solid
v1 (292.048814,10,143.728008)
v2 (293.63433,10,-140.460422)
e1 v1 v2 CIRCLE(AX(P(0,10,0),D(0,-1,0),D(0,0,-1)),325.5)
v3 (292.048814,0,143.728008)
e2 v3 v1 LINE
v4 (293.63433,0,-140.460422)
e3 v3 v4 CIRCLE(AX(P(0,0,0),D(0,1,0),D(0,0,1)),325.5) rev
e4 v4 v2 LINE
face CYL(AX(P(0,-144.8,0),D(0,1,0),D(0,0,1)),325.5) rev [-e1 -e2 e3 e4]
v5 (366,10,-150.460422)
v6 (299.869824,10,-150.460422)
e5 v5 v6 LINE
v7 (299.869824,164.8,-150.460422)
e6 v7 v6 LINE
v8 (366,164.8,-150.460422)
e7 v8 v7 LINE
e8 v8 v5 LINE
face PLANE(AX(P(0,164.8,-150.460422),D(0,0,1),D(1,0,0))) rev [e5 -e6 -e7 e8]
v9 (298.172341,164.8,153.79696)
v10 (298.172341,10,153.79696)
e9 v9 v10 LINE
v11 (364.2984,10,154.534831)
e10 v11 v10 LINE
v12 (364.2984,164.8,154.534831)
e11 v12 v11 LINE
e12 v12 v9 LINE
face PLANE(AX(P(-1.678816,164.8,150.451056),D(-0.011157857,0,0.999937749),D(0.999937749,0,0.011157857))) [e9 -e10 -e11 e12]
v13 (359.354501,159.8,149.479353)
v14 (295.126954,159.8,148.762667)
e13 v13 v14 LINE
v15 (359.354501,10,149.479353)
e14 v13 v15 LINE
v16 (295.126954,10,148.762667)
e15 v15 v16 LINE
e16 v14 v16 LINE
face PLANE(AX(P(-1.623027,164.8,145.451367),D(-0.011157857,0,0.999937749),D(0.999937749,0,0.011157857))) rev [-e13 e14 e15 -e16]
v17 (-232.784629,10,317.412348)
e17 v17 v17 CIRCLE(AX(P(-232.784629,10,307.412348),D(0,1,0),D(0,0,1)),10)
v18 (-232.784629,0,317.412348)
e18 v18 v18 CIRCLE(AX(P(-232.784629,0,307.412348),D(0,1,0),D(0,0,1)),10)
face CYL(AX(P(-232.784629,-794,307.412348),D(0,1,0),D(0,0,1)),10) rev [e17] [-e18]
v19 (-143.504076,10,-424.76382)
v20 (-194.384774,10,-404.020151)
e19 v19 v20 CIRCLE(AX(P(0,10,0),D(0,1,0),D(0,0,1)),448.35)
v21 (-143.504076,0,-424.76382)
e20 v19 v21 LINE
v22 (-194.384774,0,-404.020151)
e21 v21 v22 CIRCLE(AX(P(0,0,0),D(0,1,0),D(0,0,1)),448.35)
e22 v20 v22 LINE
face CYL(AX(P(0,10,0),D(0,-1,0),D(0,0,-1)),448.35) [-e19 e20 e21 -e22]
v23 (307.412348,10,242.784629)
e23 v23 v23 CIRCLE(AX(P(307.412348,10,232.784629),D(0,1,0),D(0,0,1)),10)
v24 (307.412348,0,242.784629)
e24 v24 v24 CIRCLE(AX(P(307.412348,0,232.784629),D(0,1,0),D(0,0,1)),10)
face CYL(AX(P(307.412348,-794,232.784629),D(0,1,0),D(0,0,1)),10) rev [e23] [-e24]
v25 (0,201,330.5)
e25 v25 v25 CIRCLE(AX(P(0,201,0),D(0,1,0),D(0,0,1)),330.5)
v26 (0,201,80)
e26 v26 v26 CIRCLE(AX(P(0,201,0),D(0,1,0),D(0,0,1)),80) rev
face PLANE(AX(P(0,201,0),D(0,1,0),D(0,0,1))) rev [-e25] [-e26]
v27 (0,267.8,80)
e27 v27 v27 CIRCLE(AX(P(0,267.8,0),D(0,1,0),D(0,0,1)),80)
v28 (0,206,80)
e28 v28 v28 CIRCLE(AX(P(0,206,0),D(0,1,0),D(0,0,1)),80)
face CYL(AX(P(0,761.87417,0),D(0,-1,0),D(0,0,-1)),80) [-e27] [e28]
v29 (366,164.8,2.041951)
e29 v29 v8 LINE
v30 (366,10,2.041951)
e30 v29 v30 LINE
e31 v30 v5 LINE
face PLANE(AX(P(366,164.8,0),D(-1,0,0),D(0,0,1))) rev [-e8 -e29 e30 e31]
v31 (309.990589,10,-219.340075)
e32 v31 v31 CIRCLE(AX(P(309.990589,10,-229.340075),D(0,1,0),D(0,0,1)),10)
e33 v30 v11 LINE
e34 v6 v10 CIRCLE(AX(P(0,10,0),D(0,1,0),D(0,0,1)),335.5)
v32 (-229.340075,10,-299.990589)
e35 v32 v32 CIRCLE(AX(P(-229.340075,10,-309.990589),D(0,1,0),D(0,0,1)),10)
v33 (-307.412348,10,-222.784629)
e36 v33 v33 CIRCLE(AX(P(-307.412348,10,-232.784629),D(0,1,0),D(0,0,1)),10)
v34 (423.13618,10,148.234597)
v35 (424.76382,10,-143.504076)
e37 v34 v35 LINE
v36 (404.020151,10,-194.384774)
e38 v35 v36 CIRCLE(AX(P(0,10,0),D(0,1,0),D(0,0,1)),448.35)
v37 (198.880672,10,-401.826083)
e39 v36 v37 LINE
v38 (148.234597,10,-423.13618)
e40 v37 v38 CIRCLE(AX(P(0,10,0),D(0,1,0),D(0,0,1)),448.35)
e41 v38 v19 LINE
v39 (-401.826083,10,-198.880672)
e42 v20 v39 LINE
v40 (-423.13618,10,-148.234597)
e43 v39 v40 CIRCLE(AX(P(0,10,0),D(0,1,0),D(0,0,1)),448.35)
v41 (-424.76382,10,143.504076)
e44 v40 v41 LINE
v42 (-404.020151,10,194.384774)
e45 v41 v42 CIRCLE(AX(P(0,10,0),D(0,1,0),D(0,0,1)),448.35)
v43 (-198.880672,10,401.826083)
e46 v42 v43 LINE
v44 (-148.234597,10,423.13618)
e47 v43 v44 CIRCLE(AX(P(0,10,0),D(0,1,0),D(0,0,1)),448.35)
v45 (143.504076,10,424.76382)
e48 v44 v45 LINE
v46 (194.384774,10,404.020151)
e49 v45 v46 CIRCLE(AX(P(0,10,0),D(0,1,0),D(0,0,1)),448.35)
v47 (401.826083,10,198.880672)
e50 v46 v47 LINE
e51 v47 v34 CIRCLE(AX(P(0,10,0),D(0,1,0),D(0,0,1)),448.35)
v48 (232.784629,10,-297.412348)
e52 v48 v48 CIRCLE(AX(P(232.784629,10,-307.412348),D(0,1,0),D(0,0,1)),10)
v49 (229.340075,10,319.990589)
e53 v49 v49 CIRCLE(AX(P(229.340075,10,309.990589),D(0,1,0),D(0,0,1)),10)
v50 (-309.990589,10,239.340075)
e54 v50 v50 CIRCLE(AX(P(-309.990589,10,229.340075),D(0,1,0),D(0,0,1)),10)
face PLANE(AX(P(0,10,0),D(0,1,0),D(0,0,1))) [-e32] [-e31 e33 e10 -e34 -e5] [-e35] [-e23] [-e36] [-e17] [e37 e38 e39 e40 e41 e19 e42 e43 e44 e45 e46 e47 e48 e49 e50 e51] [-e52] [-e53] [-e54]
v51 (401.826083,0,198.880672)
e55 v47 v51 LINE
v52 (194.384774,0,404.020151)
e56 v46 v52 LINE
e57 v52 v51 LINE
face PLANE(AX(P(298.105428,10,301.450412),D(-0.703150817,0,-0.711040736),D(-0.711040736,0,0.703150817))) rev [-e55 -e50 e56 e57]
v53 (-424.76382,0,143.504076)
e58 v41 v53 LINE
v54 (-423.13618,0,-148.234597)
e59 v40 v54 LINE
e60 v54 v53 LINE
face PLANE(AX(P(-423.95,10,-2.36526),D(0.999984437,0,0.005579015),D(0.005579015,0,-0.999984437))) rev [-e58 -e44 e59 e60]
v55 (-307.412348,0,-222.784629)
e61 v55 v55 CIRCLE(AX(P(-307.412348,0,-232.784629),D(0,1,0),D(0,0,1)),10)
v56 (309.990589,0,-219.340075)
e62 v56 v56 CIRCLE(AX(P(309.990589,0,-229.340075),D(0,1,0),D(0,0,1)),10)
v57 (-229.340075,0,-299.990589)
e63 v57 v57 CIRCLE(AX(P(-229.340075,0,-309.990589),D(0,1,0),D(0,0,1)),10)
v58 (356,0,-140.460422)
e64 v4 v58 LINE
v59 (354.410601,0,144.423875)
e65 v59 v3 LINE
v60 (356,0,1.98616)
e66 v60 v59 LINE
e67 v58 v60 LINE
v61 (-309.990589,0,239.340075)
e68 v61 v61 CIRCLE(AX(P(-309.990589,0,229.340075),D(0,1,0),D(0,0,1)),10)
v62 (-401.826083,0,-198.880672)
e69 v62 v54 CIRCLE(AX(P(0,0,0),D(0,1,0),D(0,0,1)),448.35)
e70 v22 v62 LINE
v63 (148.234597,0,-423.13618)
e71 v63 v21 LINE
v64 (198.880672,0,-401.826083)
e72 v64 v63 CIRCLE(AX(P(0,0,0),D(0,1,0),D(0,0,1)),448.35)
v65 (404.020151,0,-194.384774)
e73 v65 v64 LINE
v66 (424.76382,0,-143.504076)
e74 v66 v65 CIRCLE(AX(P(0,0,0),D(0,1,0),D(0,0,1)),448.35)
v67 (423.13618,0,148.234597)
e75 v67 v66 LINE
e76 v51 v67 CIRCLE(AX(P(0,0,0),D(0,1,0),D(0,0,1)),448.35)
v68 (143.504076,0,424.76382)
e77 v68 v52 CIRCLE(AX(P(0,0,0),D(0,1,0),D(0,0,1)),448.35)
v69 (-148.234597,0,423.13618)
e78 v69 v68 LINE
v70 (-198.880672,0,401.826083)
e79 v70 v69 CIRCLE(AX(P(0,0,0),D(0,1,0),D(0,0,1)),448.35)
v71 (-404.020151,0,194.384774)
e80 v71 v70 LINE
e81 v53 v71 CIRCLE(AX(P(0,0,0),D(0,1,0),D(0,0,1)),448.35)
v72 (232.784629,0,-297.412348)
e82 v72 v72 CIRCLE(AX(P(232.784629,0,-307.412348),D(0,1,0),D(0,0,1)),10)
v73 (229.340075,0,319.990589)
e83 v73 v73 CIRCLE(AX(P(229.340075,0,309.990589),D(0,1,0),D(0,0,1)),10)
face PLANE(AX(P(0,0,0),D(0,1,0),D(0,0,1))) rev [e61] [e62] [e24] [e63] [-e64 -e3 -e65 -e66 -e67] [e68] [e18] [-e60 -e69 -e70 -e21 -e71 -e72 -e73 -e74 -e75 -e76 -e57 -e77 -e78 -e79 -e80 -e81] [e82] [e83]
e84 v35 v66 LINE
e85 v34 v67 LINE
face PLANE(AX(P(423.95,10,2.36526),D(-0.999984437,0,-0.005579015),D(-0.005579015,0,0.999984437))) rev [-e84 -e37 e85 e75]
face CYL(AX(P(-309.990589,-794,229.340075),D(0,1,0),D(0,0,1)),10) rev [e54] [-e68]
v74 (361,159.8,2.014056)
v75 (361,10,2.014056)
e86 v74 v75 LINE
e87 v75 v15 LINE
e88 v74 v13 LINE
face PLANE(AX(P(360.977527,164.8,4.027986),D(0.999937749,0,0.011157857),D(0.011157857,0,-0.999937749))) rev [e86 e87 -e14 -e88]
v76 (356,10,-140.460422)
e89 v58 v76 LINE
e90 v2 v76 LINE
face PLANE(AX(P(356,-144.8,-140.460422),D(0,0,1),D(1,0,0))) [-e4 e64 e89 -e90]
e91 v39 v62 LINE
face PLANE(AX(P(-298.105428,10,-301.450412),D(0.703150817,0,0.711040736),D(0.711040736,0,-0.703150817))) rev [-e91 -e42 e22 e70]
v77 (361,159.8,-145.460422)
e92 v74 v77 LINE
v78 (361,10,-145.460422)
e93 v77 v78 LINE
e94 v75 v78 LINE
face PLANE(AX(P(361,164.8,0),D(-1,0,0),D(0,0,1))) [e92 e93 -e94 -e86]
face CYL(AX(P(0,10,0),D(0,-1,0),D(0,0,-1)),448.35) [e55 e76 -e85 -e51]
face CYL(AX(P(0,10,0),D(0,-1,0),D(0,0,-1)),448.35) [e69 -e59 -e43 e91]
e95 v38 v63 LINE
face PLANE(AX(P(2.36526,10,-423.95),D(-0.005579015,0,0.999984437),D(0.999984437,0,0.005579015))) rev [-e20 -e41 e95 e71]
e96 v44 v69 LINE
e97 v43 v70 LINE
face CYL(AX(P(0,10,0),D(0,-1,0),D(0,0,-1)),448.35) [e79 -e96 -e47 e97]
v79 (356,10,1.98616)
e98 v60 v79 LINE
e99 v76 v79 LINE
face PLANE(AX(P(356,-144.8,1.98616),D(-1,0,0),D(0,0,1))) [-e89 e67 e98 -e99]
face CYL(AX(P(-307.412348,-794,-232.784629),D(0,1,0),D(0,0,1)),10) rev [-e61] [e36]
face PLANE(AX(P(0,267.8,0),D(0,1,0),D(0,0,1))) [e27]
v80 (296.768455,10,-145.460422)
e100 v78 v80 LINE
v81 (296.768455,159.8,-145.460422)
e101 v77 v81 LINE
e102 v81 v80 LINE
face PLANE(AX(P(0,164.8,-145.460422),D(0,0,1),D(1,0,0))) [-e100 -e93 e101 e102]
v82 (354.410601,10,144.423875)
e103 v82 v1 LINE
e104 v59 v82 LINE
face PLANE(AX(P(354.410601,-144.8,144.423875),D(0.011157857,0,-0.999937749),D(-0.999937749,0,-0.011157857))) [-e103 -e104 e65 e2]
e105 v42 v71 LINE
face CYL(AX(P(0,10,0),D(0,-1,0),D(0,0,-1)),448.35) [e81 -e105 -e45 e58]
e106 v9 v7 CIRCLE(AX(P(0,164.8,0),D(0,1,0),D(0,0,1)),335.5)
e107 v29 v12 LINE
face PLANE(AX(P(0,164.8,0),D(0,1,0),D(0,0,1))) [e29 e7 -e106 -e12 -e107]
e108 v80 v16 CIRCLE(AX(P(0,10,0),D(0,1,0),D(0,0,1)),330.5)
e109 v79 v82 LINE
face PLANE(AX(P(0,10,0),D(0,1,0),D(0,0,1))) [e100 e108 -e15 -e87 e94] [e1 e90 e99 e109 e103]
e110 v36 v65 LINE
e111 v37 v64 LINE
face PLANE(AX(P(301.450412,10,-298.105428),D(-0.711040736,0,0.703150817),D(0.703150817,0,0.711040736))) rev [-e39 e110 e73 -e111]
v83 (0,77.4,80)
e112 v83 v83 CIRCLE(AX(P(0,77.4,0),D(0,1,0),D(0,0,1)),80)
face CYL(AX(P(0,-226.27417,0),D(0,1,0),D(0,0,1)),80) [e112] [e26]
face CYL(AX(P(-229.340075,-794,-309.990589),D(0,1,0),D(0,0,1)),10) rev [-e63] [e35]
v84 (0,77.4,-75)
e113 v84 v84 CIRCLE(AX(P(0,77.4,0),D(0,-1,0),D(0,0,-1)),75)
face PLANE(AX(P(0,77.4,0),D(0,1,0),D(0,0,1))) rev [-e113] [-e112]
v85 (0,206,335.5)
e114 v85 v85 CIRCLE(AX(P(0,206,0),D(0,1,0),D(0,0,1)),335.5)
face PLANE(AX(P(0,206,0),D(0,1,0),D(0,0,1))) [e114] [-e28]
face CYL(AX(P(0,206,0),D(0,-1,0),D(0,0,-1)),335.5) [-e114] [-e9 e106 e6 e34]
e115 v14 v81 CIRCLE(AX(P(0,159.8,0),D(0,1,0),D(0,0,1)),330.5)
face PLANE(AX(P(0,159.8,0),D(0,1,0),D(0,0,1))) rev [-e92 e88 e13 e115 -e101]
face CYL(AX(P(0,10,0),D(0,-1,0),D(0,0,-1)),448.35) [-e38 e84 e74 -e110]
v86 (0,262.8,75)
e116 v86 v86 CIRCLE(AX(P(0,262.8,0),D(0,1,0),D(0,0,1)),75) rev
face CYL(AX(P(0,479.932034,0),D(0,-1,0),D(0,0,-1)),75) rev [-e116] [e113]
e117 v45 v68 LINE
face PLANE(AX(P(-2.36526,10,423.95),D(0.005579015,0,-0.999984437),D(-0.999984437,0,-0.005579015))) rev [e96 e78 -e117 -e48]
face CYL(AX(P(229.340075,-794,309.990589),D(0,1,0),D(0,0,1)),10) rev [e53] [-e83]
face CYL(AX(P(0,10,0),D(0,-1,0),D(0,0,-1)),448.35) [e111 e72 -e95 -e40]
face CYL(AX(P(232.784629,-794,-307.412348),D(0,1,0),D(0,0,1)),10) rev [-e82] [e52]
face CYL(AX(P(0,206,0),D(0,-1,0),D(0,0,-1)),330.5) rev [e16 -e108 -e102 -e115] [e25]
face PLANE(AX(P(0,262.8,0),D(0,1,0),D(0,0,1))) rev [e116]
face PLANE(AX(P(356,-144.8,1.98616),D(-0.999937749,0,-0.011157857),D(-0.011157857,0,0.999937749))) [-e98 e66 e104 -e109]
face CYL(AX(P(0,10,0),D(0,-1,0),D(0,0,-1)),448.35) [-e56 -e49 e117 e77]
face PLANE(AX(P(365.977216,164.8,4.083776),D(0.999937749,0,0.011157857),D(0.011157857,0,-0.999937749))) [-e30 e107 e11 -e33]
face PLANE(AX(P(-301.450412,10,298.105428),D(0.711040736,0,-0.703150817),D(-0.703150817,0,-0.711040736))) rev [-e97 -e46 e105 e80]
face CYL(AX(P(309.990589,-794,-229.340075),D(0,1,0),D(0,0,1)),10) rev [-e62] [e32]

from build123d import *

# Parameters (mm, degrees)
EXTRUDE_1_DEPTH          = 10
SKETCH_3_R               = 335.5
EXTRUDE_4_DEPTH          = 196
EXTRUDE_5_DEPTH          = 154.8
SHELL_START              = 10
SHELL_3_OUTLINE_R        = 330.5
SHELL_3_DEPTH            = 191
SHELL_3_2_DEPTH          = 149.8
CUT_EXTRUDE_1_DEPTH      = 154.8
SKETCH_8_R               = 80
EXTRUDE_7_DEPTH          = 61.8
SKETCH_9_R               = 80
EXTRUDE_8_DEPTH          = 123.6
SKETCH_10_R              = 75
CUT_EXTRUDE_2_DEPTH      = 185.4
SKETCH_11_R              = 10
CUT_EXTRUDE_4_DEPTH      = 1000
PATTERN_CIRCULAR_1_COUNT = 4


# Read off the part's stored shape, not the designer's step: 抽壳3
with BuildPart() as part:
    # 草图2 → 凸台-拉伸1 (new body)
    with BuildSketch(Plane(origin=(0, 0, 0), x_dir=(1, 0, 0), z_dir=(0, 1, 0))):
        with BuildLine():
            ThreePointArc((198.880672379, 401.826082595), (173.884394221, 413.257716136), (148.234596604, 423.136180053))
            Line((148.234596604, 423.136180053), (-143.504075774, 424.763819947))
            ThreePointArc((-143.504075774, 424.763819947), (-169.262499161, 415.172167754), (-194.384773816, 404.020150746))
            Line((-194.384773816, 404.020150746), (-401.826082595, 198.880672379))
            ThreePointArc((-401.826082595, 198.880672379), (-413.257716136, 173.884394221), (-423.136180053, 148.234596604))
            Line((-423.136180053, 148.234596604), (-424.763819947, -143.504075774))
            ThreePointArc((-424.763819947, -143.504075774), (-415.172167754, -169.262499161), (-404.020150746, -194.384773816))
            Line((-404.020150746, -194.384773816), (-198.880672379, -401.826082595))
            ThreePointArc((-198.880672379, -401.826082595), (-173.884394221, -413.257716136), (-148.234596604, -423.136180053))
            Line((-148.234596604, -423.136180053), (143.504075774, -424.763819947))
            ThreePointArc((143.504075774, -424.763819947), (169.262499161, -415.172167754), (194.384773816, -404.020150746))
            Line((194.384773816, -404.020150746), (401.826082595, -198.880672379))
            ThreePointArc((401.826082595, -198.880672379), (413.257716136, -173.884394221), (423.136180053, -148.234596604))
            Line((423.136180053, -148.234596604), (424.763819947, 143.504075774))
            ThreePointArc((424.763819947, 143.504075774), (415.172167754, 169.262499161), (404.020150746, 194.384773816))
            Line((404.020150746, 194.384773816), (198.880672379, 401.826082595))
        make_face()
    extrude(amount=EXTRUDE_1_DEPTH)

    # 草图7 → 切除-拉伸1 (cut)
    with BuildSketch(Plane.XZ.offset(-10)):
        with BuildLine():
            Line((354.410601365, 144.423875342), (292.048813878, 143.7280081))
            ThreePointArc((292.048813878, 143.7280081), (-325.4949343, -1.815969532), (293.634330198, -140.460421931))
            Line((293.634330198, -140.460421931), (356, -140.460421931))
            Line((356, -140.460421931), (356, 1.986160414))
            Line((356, 1.986160414), (354.410601365, 144.423875342))
        make_face()
    extrude(amount=CUT_EXTRUDE_1_DEPTH, mode=Mode.SUBTRACT)


with BuildPart() as body_2:
    # 草图3 → 凸台-拉伸4 (new body)
    with BuildSketch(Plane(origin=(0, 10, 0), x_dir=(1, 0, 0), z_dir=(0, 1, 0))):
        with Locations(Location((0, 0, 0), (0, 0, 270))):
            Circle(SKETCH_3_R)
    extrude(amount=EXTRUDE_4_DEPTH)


with BuildPart() as body_3:
    # 草图6 → 凸台-拉伸5 (new body)
    with BuildSketch(Plane(origin=(0, 10, 0), x_dir=(1, 0, 0), z_dir=(0, 1, 0))):
        with BuildLine():
            Line((366, -2.041951437), (335.494778671, -1.871759687))
            ThreePointArc((335.494778671, -1.871759687), (325.812555489, -80.040169201), (298.172341087, -153.796960343))
            Line((298.172341087, -153.796960343), (364.298400285, -154.534831406))
            Line((364.298400285, -154.534831406), (366, -2.041951437))
        make_face()
        with BuildLine():
            ThreePointArc((335.5, 0), (335.498694665, -0.935883485), (335.494778671, -1.871759687))
            Line((335.494778671, -1.871759687), (366, -2.041951437))
            Line((366, -2.041951437), (366, 150.460421931))
            Line((366, 150.460421931), (299.869824144, 150.460421931))
            ThreePointArc((299.869824144, 150.460421931), (326.470960424, 77.310814249), (335.5, 0))
        make_face()
    extrude(amount=EXTRUDE_5_DEPTH)


with BuildPart() as body_2_1:
    add(body_2.part)

    # Combine 1: union body 3
    add(body_3.part)

    # 抽壳3 outline → 抽壳3 (cut)
    with BuildSketch(Plane(origin=(0, 0, 0), x_dir=(1, 0, 0), z_dir=(0, 1, 0)).offset(SHELL_START)):
        Circle(SHELL_3_OUTLINE_R)
    extrude(amount=SHELL_3_DEPTH, mode=Mode.SUBTRACT)

    # Shell 3 2 outline → Shell 3 2 (cut)
    with BuildSketch(Plane(origin=(0, 0, 0), x_dir=(1, 0, 0), z_dir=(0, 1, 0)).offset(SHELL_START)):
        with BuildLine():
            ThreePointArc((296.76845461, 145.460421931), (330.494856485, -1.84386461), (295.126953902, -148.762666958))
            Line((295.126953902, -148.762666958), (359.354500825, -149.479353374))
            Line((359.354500825, -149.479353374), (361, -2.014055926))
            Line((361, -2.014055926), (361, 145.460421931))
            Line((361, 145.460421931), (296.76845461, 145.460421931))
        make_face()
    extrude(amount=SHELL_3_2_DEPTH, mode=Mode.SUBTRACT)

    # Combine 2: union part
    add(part.part)

    # 草图8 → 凸台-拉伸7 (add)
    with BuildSketch(Plane(origin=(0, 206, 0), x_dir=(1, 0, 0), z_dir=(0, 1, 0))):
        with Locations(Location((0, 0, 0), (0, 0, 270))):
            Circle(SKETCH_8_R)
    extrude(amount=EXTRUDE_7_DEPTH)

    # 草图9 → 凸台-拉伸8 (add)
    with BuildSketch(Plane(origin=(0, 201, 0), x_dir=(-1, 0, 0), z_dir=(0, -1, 0))):
        with Locations(Location((0, 0, 0), (0, 0, 270))):
            Circle(SKETCH_9_R)
    extrude(amount=EXTRUDE_8_DEPTH)

    # 草图10 → 切除-拉伸2 (cut)
    with BuildSketch(Plane.XZ.offset(-77.4)):
        with Locations(Location((0, 0, 0), (0, 0, 270))):
            Circle(SKETCH_10_R)
    extrude(amount=-CUT_EXTRUDE_2_DEPTH, mode=Mode.SUBTRACT)

    # 草图11 → 切除-拉伸4 (cut)
    with BuildSketch(Plane(origin=(0, 206, 0), x_dir=(1, 0, 0), z_dir=(0, 1, 0))):
        with Locations(Location((-229.340075244, 309.990589083, 0), (0, 0, 270))):
            Circle(SKETCH_11_R)
        with Locations(Location((-307.412348087, 232.784629383, 0), (0, 0, 270))):
            Circle(SKETCH_11_R)
    cut_extrude_4 = extrude(amount=-CUT_EXTRUDE_4_DEPTH, mode=Mode.SUBTRACT)

    # 阵列(圆周)1: 切除-拉伸4 ×4 about axis
    pattern_circular_1_axis = Axis((0, 0, 0), (0, 1, 0))
    for i in range(1, PATTERN_CIRCULAR_1_COUNT):
        add(cut_extrude_4.rotate(pattern_circular_1_axis, i * 360 / PATTERN_CIRCULAR_1_COUNT), mode=Mode.SUBTRACT)


solid = body_2_1.part
